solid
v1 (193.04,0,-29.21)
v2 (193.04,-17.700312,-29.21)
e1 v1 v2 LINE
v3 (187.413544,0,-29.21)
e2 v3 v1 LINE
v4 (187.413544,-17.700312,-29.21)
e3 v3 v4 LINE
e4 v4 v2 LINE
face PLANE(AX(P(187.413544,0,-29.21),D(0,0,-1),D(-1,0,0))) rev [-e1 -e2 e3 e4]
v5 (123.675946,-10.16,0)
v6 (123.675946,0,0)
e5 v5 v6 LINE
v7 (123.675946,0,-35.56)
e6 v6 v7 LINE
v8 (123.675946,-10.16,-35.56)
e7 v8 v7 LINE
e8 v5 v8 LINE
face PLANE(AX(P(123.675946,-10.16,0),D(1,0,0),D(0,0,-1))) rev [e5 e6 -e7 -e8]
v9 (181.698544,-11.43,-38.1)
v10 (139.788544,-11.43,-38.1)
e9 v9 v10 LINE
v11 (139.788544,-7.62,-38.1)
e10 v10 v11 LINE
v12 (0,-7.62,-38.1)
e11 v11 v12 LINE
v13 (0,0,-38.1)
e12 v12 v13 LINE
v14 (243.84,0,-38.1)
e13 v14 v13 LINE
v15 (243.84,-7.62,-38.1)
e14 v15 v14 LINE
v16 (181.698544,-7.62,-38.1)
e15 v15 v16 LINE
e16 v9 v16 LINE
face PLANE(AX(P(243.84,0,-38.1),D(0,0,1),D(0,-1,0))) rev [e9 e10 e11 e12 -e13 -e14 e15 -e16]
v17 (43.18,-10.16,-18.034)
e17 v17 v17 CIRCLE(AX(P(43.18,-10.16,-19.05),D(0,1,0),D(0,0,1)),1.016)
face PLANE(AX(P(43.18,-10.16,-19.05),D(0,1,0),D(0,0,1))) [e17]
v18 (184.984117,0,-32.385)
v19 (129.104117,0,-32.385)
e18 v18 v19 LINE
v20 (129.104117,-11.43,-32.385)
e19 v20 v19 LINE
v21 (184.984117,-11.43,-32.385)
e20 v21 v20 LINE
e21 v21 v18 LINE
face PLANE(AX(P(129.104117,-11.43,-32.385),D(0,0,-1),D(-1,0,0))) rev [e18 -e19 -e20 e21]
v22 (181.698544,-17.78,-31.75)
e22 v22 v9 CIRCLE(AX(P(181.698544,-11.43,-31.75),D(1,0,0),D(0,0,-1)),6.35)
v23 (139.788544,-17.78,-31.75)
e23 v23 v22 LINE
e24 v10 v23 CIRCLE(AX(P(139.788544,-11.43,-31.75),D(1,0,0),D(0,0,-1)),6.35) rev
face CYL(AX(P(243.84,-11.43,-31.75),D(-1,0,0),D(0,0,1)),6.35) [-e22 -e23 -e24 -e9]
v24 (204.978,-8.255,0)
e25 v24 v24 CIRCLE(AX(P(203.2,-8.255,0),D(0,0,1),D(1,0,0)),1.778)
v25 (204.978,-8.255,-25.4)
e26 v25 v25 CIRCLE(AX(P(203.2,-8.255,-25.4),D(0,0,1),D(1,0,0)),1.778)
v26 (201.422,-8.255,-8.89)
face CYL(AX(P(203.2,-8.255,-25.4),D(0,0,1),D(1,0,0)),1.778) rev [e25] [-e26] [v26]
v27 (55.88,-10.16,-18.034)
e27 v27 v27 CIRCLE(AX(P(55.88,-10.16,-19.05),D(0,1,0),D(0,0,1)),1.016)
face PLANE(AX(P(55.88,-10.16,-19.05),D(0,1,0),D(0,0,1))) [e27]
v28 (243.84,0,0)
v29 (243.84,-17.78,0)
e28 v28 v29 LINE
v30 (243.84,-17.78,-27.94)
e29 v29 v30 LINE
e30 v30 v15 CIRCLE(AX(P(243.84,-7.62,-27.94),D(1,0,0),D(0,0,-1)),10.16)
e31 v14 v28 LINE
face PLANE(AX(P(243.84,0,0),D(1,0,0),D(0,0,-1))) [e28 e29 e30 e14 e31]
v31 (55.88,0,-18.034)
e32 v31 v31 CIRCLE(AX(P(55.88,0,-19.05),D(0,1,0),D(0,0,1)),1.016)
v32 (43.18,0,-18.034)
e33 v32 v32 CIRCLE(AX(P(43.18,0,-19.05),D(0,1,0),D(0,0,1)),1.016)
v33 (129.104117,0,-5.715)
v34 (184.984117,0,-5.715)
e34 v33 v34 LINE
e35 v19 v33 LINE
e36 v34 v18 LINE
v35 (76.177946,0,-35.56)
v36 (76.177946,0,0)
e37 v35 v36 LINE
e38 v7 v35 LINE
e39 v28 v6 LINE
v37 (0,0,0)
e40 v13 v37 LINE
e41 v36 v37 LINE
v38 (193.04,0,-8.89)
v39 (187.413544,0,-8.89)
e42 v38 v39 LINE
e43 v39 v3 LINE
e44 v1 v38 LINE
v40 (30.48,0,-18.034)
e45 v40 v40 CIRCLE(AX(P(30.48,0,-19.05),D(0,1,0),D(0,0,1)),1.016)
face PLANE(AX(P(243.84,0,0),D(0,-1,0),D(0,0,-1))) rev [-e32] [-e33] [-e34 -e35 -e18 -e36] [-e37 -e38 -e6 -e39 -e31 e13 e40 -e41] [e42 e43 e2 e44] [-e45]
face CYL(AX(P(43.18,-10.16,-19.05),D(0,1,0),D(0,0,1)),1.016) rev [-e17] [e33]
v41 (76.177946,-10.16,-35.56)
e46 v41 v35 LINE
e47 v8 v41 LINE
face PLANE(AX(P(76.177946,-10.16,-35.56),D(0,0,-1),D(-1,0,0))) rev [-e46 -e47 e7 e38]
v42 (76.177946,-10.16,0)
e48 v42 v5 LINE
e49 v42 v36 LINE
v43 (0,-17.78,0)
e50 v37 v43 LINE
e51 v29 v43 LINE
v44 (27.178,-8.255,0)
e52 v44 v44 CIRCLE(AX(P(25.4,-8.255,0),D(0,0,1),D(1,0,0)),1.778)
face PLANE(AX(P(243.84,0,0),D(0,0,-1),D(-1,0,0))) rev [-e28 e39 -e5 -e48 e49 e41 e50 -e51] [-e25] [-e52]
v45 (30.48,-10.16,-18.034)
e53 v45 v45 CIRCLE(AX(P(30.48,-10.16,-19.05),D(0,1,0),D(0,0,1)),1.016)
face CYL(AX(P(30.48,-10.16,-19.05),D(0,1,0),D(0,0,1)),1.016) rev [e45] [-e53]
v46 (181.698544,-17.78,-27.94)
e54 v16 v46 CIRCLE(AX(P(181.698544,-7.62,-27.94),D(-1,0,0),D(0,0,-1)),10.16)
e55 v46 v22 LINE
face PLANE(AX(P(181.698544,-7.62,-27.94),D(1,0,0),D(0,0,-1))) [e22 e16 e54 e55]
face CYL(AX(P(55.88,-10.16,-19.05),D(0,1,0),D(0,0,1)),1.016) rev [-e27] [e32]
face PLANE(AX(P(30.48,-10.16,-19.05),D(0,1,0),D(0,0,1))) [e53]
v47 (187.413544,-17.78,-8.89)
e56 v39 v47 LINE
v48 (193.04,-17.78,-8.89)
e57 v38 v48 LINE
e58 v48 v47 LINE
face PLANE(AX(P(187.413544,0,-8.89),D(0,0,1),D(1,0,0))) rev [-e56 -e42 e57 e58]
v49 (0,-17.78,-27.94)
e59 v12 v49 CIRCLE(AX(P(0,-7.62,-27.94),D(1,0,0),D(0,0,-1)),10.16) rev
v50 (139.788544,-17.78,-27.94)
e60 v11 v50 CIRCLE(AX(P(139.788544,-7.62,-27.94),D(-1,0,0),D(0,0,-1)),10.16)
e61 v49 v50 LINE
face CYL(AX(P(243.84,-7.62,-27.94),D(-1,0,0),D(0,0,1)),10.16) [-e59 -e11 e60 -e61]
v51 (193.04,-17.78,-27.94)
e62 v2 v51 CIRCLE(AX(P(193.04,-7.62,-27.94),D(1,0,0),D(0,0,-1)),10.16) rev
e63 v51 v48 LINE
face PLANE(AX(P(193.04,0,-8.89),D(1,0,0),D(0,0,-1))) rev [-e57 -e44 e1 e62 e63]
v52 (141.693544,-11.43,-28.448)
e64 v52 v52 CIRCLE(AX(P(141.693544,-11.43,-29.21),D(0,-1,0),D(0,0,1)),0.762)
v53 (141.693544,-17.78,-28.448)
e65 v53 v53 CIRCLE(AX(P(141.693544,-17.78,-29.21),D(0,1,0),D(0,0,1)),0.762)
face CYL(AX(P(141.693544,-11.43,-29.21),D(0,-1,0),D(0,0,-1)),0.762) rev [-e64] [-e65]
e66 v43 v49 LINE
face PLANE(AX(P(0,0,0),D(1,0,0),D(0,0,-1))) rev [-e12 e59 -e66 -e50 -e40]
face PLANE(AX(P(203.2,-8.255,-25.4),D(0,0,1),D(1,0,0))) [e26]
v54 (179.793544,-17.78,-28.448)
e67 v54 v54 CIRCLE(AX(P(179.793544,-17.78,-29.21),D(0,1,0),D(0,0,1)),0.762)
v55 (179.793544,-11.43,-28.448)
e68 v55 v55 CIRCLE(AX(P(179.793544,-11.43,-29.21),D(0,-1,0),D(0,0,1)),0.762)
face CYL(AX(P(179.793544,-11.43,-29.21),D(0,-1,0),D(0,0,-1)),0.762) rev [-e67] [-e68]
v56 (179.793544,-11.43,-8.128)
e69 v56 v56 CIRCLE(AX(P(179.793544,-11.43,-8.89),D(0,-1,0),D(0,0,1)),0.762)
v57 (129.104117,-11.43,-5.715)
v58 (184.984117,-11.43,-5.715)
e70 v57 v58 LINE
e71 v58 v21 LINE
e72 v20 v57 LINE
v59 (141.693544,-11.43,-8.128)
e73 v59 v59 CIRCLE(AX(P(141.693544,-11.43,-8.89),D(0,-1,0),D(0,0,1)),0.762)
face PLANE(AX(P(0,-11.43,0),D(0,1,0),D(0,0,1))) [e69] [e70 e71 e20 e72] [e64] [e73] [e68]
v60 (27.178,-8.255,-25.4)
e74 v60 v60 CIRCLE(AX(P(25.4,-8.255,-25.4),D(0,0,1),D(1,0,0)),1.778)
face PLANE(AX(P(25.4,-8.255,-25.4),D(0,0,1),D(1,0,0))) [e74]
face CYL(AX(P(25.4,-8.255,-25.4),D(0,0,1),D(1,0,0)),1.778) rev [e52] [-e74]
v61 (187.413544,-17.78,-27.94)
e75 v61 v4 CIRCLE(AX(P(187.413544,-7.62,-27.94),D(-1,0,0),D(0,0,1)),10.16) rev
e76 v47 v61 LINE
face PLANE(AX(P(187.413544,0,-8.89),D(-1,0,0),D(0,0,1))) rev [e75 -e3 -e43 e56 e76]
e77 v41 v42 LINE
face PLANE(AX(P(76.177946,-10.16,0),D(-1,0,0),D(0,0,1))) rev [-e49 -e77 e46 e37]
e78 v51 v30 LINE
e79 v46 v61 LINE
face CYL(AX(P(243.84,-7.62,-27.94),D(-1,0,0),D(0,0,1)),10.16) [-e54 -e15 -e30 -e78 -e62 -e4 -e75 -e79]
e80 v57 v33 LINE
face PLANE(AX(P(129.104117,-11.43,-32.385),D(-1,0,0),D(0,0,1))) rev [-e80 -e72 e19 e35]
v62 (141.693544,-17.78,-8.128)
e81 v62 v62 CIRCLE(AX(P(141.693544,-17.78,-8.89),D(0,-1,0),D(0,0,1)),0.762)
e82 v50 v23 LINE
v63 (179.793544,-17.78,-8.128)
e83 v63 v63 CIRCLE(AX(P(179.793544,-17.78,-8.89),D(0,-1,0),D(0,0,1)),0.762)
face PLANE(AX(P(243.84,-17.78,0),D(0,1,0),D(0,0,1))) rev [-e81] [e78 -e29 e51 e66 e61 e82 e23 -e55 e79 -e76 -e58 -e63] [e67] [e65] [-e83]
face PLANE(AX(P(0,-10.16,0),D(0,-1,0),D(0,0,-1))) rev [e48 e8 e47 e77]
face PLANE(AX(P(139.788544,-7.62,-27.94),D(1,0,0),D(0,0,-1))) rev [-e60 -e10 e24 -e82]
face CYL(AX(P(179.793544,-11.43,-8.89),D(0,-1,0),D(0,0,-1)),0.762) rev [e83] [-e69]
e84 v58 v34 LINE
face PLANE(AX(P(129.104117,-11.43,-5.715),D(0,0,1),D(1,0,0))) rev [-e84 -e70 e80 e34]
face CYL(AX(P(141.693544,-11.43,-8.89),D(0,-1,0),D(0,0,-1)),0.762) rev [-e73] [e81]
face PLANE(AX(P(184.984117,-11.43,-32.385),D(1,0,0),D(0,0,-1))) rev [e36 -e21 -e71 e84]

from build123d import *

# Parameters (mm, degrees)
SKETCH1_W               = 38.1
SKETCH1_H               = 17.78
BOSS_EXTRUDE1_DEPTH     = 243.84
SKETCH2_W               = 55.88
SKETCH2_H               = 26.67
CUT_EXTRUDE1_DEPTH      = 11.43
SKETCH3_W               = 47.498
SKETCH3_H               = 35.56
CUT_EXTRUDE2_DEPTH      = 10.16
SKETCH4_R               = 1.778
CUT_EXTRUDE3_DEPTH      = 25.4
SKETCH5_R               = 1.016
CUT_EXTRUDE4_DEPTH      = 10.16
SKETCH6_R               = 0.762
CUT_EXTRUDE5_DEPTH      = 6.35
LPATTERN1_COUNT         = 2
LPATTERN1_PITCH         = 38.1
LPATTERN2_COUNT         = 3
LPATTERN2_PITCH         = 12.7
MIRROR2_COPY_1_SKETCH_R = 0.762
MIRROR2_COPY_1_DEPTH    = 6.35
SKETCH7_W               = 5.626456328
SKETCH7_H               = 20.32
CUT_EXTRUDE6_DEPTH      = 248.4382428
MIRROR3_COPY_1_SKETCH_R = 0.762
MIRROR3_COPY_1_DEPTH    = 6.35
MIRROR3_COPY_2_SKETCH_R = 0.762
MIRROR3_COPY_2_DEPTH    = 6.35
MIRROR3_COPY_3_SKETCH_R = 0.762
MIRROR3_COPY_3_DEPTH    = 6.35
SKETCH8_R               = 0.762
BOSS_EXTRUDE2_DEPTH     = 17.78
FILLET1_R               = 10.16
BOSS_EXTRUDE3_DEPTH     = 20.955
SKETCH12_R              = 0.762
CUT_EXTRUDE8_DEPTH      = 248.063150834
FILLET2_R               = 6.35


with BuildPart() as part:
    # Sketch1 → Boss-Extrude1 (new body)
    with BuildSketch(Plane(origin=(0, 0, 0), x_dir=(0, 0, -1), z_dir=(1, 0, 0))):
        with Locations((19.05, -8.89)):
            Rectangle(SKETCH1_W, SKETCH1_H)
    extrude(amount=BOSS_EXTRUDE1_DEPTH)

    # Sketch2 → Cut-Extrude1 (cut)
    with BuildSketch(Plane(origin=(0, 0, 0), x_dir=(1, 0, 0), z_dir=(0, 1, 0))):
        with Locations((157.044117332, 19.05)):
            Rectangle(SKETCH2_W, SKETCH2_H)
    extrude(amount=-CUT_EXTRUDE1_DEPTH, mode=Mode.SUBTRACT)

    # Sketch3 → Cut-Extrude2 (cut)
    with BuildSketch(Plane(origin=(0, 0, 0), x_dir=(1, 0, 0), z_dir=(0, 1, 0))):
        with Locations((99.926945865, 17.78)):
            Rectangle(SKETCH3_W, SKETCH3_H)
    extrude(amount=-CUT_EXTRUDE2_DEPTH, mode=Mode.SUBTRACT)

    # Sketch4 → Cut-Extrude3 (cut)
    with BuildSketch(Plane.XY):
        with Locations((25.4, -8.255)):
            Circle(SKETCH4_R)
        with Locations((203.2, -8.255)):
            Circle(SKETCH4_R)
    extrude(amount=-CUT_EXTRUDE3_DEPTH, mode=Mode.SUBTRACT)

    # Sketch5 → Cut-Extrude4 (cut)
    with BuildSketch(Plane(origin=(0, 0, 0), x_dir=(1, 0, 0), z_dir=(0, 1, 0))):
        with Locations(Location((55.88, 19.05, 0), (0, 0, 270))):
            Circle(SKETCH5_R)
    cut_extrude4 = extrude(amount=-CUT_EXTRUDE4_DEPTH, mode=Mode.SUBTRACT)

    # Sketch6 → Cut-Extrude5 (cut)
    with BuildSketch(Plane(origin=(0, 0, 0), x_dir=(1, 0, 0), z_dir=(0, 1, 0))):
        with Locations(Location((200.66, 29.21, 0), (0, 0, 270))):
            Circle(SKETCH6_R)
        with Locations(Location((200.66, 8.89, 0), (0, 0, 270))):
            Circle(SKETCH6_R)
    cut_extrude5 = extrude(amount=-CUT_EXTRUDE5_DEPTH, mode=Mode.SUBTRACT)

    # LPattern1: Cut-Extrude5 ×2
    with Locations(*[(i * LPATTERN1_PITCH, 0, 0) for i in range(1, LPATTERN1_COUNT)]):
        add(cut_extrude5, mode=Mode.SUBTRACT)

    # LPattern2: Cut-Extrude4 ×3
    with Locations(*[(-i * LPATTERN2_PITCH, 0, 0) for i in range(1, LPATTERN2_COUNT)]):
        add(cut_extrude4, mode=Mode.SUBTRACT)

    # Mirror2: Cut-Extrude5 across plane
    add(cut_extrude5.mirror(Plane.ZX.offset(-8.89)), mode=Mode.SUBTRACT)

    # Mirror2 copy 1 sketch → Mirror2 copy 1 (cut)
    with BuildSketch(Plane(origin=(38.1, -17.78, 0), x_dir=(1, 0, 0), z_dir=(0, -1, 0))):
        with Locations((200.66, -29.21)):
            Circle(MIRROR2_COPY_1_SKETCH_R)
        with Locations((200.66, -8.89)):
            Circle(MIRROR2_COPY_1_SKETCH_R)
    extrude(amount=-MIRROR2_COPY_1_DEPTH, mode=Mode.SUBTRACT)

    # Sketch7 → Cut-Extrude6 (cut, through all)
    with BuildSketch(Plane.XZ.offset(17.78)):
        with Locations((190.226771836, -19.05)):
            Rectangle(SKETCH7_W, SKETCH7_H)
    extrude(amount=-CUT_EXTRUDE6_DEPTH, mode=Mode.SUBTRACT)

    # Mirror3 copy 1 sketch → Mirror3 copy 1 (cut)
    with BuildSketch(Plane(origin=(380.453543672, -17.78, 0), x_dir=(-1, 0, 0), z_dir=(0, -1, 0))):
        with Locations(Location((200.66, 29.21, 0), (0, 0, 270))):
            Circle(MIRROR3_COPY_1_SKETCH_R)
        with Locations(Location((200.66, 8.89, 0), (0, 0, 270))):
            Circle(MIRROR3_COPY_1_SKETCH_R)
    extrude(amount=-MIRROR3_COPY_1_DEPTH, mode=Mode.SUBTRACT)

    # Mirror3 copy 2 sketch → Mirror3 copy 2 (cut)
    with BuildSketch(Plane(origin=(342.353543672, -17.78, 0), x_dir=(-1, 0, 0), z_dir=(0, -1, 0))):
        with Locations(Location((200.66, 29.21, 0), (0, 0, 270))):
            Circle(MIRROR3_COPY_2_SKETCH_R)
        with Locations(Location((200.66, 8.89, 0), (0, 0, 270))):
            Circle(MIRROR3_COPY_2_SKETCH_R)
    extrude(amount=-MIRROR3_COPY_2_DEPTH, mode=Mode.SUBTRACT)

    # Mirror3 copy 3 sketch → Mirror3 copy 3 (cut)
    with BuildSketch(Plane(origin=(380.453543672, 0, 0), x_dir=(-1, 0, 0), z_dir=(0, 1, 0))):
        with Locations((200.66, -29.21)):
            Circle(MIRROR3_COPY_3_SKETCH_R)
        with Locations((200.66, -8.89)):
            Circle(MIRROR3_COPY_3_SKETCH_R)
    extrude(amount=-MIRROR3_COPY_3_DEPTH, mode=Mode.SUBTRACT)

    # Sketch8 → Boss-Extrude2 (add)
    with BuildSketch(Plane.XZ.offset(17.78)):
        with Locations((200.66, -8.89)):
            Circle(SKETCH8_R)
        with Locations((238.76, -8.89)):
            Circle(SKETCH8_R)
        with Locations((238.76, -29.21)):
            Circle(SKETCH8_R)
        with Locations((200.66, -29.21)):
            Circle(SKETCH8_R)
    extrude(amount=-BOSS_EXTRUDE2_DEPTH)

    # Fillet1
    # the kernel refuses this fillet: 10.16 mm, written as the material it takes off along each edge
    with BuildSketch(Plane(origin=(-25.4, -17.78, -38.1), x_dir=(0, 1, 0), z_dir=(1, 0, 0))) as fillet1_piece_1:
        with BuildLine():
            CenterArc((FILLET1_R, FILLET1_R), FILLET1_R, 180, 90)
            Line((0, FILLET1_R), (0, 0))
            Line((0, 0), (FILLET1_R, 0))
        make_face()
    extrude(amount=294.64, mode=Mode.SUBTRACT)

    # Sketch11 → Boss-Extrude3 (add, symmetric)
    with BuildSketch(Plane(origin=(160.743543672, 0, 0), x_dir=(0, 0, -1), z_dir=(1, 0, 0))):
        with BuildLine():
            Line((27.94, -17.78), (38.1, -17.78))
            Line((38.1, -17.78), (38.1, -7.62))
            ThreePointArc((38.1, -7.62), (35.124204897, -14.804204897), (27.94, -17.78))
        make_face()
    extrude(amount=BOSS_EXTRUDE3_DEPTH, both=True)

    # Sketch12 → Cut-Extrude8 (cut, through all)
    with BuildSketch(Plane(origin=(0, -11.43, 0), x_dir=(1, 0, 0), z_dir=(0, 1, 0))):
        with Locations(Location((141.693543672, 29.21, 0), (0, 0, 270))):
            Circle(SKETCH12_R)
        with Locations(Location((179.793543672, 29.21, 0), (0, 0, 270))):
            Circle(SKETCH12_R)
    extrude(amount=-CUT_EXTRUDE8_DEPTH, mode=Mode.SUBTRACT)

    # Fillet2
    fillet2_edges = [part.edges().sort_by_distance(p)[0] for p in [
        (160.743543672, -17.78, -38.1),
    ]]
    fillet(fillet2_edges, radius=FILLET2_R)


solid = part.part
